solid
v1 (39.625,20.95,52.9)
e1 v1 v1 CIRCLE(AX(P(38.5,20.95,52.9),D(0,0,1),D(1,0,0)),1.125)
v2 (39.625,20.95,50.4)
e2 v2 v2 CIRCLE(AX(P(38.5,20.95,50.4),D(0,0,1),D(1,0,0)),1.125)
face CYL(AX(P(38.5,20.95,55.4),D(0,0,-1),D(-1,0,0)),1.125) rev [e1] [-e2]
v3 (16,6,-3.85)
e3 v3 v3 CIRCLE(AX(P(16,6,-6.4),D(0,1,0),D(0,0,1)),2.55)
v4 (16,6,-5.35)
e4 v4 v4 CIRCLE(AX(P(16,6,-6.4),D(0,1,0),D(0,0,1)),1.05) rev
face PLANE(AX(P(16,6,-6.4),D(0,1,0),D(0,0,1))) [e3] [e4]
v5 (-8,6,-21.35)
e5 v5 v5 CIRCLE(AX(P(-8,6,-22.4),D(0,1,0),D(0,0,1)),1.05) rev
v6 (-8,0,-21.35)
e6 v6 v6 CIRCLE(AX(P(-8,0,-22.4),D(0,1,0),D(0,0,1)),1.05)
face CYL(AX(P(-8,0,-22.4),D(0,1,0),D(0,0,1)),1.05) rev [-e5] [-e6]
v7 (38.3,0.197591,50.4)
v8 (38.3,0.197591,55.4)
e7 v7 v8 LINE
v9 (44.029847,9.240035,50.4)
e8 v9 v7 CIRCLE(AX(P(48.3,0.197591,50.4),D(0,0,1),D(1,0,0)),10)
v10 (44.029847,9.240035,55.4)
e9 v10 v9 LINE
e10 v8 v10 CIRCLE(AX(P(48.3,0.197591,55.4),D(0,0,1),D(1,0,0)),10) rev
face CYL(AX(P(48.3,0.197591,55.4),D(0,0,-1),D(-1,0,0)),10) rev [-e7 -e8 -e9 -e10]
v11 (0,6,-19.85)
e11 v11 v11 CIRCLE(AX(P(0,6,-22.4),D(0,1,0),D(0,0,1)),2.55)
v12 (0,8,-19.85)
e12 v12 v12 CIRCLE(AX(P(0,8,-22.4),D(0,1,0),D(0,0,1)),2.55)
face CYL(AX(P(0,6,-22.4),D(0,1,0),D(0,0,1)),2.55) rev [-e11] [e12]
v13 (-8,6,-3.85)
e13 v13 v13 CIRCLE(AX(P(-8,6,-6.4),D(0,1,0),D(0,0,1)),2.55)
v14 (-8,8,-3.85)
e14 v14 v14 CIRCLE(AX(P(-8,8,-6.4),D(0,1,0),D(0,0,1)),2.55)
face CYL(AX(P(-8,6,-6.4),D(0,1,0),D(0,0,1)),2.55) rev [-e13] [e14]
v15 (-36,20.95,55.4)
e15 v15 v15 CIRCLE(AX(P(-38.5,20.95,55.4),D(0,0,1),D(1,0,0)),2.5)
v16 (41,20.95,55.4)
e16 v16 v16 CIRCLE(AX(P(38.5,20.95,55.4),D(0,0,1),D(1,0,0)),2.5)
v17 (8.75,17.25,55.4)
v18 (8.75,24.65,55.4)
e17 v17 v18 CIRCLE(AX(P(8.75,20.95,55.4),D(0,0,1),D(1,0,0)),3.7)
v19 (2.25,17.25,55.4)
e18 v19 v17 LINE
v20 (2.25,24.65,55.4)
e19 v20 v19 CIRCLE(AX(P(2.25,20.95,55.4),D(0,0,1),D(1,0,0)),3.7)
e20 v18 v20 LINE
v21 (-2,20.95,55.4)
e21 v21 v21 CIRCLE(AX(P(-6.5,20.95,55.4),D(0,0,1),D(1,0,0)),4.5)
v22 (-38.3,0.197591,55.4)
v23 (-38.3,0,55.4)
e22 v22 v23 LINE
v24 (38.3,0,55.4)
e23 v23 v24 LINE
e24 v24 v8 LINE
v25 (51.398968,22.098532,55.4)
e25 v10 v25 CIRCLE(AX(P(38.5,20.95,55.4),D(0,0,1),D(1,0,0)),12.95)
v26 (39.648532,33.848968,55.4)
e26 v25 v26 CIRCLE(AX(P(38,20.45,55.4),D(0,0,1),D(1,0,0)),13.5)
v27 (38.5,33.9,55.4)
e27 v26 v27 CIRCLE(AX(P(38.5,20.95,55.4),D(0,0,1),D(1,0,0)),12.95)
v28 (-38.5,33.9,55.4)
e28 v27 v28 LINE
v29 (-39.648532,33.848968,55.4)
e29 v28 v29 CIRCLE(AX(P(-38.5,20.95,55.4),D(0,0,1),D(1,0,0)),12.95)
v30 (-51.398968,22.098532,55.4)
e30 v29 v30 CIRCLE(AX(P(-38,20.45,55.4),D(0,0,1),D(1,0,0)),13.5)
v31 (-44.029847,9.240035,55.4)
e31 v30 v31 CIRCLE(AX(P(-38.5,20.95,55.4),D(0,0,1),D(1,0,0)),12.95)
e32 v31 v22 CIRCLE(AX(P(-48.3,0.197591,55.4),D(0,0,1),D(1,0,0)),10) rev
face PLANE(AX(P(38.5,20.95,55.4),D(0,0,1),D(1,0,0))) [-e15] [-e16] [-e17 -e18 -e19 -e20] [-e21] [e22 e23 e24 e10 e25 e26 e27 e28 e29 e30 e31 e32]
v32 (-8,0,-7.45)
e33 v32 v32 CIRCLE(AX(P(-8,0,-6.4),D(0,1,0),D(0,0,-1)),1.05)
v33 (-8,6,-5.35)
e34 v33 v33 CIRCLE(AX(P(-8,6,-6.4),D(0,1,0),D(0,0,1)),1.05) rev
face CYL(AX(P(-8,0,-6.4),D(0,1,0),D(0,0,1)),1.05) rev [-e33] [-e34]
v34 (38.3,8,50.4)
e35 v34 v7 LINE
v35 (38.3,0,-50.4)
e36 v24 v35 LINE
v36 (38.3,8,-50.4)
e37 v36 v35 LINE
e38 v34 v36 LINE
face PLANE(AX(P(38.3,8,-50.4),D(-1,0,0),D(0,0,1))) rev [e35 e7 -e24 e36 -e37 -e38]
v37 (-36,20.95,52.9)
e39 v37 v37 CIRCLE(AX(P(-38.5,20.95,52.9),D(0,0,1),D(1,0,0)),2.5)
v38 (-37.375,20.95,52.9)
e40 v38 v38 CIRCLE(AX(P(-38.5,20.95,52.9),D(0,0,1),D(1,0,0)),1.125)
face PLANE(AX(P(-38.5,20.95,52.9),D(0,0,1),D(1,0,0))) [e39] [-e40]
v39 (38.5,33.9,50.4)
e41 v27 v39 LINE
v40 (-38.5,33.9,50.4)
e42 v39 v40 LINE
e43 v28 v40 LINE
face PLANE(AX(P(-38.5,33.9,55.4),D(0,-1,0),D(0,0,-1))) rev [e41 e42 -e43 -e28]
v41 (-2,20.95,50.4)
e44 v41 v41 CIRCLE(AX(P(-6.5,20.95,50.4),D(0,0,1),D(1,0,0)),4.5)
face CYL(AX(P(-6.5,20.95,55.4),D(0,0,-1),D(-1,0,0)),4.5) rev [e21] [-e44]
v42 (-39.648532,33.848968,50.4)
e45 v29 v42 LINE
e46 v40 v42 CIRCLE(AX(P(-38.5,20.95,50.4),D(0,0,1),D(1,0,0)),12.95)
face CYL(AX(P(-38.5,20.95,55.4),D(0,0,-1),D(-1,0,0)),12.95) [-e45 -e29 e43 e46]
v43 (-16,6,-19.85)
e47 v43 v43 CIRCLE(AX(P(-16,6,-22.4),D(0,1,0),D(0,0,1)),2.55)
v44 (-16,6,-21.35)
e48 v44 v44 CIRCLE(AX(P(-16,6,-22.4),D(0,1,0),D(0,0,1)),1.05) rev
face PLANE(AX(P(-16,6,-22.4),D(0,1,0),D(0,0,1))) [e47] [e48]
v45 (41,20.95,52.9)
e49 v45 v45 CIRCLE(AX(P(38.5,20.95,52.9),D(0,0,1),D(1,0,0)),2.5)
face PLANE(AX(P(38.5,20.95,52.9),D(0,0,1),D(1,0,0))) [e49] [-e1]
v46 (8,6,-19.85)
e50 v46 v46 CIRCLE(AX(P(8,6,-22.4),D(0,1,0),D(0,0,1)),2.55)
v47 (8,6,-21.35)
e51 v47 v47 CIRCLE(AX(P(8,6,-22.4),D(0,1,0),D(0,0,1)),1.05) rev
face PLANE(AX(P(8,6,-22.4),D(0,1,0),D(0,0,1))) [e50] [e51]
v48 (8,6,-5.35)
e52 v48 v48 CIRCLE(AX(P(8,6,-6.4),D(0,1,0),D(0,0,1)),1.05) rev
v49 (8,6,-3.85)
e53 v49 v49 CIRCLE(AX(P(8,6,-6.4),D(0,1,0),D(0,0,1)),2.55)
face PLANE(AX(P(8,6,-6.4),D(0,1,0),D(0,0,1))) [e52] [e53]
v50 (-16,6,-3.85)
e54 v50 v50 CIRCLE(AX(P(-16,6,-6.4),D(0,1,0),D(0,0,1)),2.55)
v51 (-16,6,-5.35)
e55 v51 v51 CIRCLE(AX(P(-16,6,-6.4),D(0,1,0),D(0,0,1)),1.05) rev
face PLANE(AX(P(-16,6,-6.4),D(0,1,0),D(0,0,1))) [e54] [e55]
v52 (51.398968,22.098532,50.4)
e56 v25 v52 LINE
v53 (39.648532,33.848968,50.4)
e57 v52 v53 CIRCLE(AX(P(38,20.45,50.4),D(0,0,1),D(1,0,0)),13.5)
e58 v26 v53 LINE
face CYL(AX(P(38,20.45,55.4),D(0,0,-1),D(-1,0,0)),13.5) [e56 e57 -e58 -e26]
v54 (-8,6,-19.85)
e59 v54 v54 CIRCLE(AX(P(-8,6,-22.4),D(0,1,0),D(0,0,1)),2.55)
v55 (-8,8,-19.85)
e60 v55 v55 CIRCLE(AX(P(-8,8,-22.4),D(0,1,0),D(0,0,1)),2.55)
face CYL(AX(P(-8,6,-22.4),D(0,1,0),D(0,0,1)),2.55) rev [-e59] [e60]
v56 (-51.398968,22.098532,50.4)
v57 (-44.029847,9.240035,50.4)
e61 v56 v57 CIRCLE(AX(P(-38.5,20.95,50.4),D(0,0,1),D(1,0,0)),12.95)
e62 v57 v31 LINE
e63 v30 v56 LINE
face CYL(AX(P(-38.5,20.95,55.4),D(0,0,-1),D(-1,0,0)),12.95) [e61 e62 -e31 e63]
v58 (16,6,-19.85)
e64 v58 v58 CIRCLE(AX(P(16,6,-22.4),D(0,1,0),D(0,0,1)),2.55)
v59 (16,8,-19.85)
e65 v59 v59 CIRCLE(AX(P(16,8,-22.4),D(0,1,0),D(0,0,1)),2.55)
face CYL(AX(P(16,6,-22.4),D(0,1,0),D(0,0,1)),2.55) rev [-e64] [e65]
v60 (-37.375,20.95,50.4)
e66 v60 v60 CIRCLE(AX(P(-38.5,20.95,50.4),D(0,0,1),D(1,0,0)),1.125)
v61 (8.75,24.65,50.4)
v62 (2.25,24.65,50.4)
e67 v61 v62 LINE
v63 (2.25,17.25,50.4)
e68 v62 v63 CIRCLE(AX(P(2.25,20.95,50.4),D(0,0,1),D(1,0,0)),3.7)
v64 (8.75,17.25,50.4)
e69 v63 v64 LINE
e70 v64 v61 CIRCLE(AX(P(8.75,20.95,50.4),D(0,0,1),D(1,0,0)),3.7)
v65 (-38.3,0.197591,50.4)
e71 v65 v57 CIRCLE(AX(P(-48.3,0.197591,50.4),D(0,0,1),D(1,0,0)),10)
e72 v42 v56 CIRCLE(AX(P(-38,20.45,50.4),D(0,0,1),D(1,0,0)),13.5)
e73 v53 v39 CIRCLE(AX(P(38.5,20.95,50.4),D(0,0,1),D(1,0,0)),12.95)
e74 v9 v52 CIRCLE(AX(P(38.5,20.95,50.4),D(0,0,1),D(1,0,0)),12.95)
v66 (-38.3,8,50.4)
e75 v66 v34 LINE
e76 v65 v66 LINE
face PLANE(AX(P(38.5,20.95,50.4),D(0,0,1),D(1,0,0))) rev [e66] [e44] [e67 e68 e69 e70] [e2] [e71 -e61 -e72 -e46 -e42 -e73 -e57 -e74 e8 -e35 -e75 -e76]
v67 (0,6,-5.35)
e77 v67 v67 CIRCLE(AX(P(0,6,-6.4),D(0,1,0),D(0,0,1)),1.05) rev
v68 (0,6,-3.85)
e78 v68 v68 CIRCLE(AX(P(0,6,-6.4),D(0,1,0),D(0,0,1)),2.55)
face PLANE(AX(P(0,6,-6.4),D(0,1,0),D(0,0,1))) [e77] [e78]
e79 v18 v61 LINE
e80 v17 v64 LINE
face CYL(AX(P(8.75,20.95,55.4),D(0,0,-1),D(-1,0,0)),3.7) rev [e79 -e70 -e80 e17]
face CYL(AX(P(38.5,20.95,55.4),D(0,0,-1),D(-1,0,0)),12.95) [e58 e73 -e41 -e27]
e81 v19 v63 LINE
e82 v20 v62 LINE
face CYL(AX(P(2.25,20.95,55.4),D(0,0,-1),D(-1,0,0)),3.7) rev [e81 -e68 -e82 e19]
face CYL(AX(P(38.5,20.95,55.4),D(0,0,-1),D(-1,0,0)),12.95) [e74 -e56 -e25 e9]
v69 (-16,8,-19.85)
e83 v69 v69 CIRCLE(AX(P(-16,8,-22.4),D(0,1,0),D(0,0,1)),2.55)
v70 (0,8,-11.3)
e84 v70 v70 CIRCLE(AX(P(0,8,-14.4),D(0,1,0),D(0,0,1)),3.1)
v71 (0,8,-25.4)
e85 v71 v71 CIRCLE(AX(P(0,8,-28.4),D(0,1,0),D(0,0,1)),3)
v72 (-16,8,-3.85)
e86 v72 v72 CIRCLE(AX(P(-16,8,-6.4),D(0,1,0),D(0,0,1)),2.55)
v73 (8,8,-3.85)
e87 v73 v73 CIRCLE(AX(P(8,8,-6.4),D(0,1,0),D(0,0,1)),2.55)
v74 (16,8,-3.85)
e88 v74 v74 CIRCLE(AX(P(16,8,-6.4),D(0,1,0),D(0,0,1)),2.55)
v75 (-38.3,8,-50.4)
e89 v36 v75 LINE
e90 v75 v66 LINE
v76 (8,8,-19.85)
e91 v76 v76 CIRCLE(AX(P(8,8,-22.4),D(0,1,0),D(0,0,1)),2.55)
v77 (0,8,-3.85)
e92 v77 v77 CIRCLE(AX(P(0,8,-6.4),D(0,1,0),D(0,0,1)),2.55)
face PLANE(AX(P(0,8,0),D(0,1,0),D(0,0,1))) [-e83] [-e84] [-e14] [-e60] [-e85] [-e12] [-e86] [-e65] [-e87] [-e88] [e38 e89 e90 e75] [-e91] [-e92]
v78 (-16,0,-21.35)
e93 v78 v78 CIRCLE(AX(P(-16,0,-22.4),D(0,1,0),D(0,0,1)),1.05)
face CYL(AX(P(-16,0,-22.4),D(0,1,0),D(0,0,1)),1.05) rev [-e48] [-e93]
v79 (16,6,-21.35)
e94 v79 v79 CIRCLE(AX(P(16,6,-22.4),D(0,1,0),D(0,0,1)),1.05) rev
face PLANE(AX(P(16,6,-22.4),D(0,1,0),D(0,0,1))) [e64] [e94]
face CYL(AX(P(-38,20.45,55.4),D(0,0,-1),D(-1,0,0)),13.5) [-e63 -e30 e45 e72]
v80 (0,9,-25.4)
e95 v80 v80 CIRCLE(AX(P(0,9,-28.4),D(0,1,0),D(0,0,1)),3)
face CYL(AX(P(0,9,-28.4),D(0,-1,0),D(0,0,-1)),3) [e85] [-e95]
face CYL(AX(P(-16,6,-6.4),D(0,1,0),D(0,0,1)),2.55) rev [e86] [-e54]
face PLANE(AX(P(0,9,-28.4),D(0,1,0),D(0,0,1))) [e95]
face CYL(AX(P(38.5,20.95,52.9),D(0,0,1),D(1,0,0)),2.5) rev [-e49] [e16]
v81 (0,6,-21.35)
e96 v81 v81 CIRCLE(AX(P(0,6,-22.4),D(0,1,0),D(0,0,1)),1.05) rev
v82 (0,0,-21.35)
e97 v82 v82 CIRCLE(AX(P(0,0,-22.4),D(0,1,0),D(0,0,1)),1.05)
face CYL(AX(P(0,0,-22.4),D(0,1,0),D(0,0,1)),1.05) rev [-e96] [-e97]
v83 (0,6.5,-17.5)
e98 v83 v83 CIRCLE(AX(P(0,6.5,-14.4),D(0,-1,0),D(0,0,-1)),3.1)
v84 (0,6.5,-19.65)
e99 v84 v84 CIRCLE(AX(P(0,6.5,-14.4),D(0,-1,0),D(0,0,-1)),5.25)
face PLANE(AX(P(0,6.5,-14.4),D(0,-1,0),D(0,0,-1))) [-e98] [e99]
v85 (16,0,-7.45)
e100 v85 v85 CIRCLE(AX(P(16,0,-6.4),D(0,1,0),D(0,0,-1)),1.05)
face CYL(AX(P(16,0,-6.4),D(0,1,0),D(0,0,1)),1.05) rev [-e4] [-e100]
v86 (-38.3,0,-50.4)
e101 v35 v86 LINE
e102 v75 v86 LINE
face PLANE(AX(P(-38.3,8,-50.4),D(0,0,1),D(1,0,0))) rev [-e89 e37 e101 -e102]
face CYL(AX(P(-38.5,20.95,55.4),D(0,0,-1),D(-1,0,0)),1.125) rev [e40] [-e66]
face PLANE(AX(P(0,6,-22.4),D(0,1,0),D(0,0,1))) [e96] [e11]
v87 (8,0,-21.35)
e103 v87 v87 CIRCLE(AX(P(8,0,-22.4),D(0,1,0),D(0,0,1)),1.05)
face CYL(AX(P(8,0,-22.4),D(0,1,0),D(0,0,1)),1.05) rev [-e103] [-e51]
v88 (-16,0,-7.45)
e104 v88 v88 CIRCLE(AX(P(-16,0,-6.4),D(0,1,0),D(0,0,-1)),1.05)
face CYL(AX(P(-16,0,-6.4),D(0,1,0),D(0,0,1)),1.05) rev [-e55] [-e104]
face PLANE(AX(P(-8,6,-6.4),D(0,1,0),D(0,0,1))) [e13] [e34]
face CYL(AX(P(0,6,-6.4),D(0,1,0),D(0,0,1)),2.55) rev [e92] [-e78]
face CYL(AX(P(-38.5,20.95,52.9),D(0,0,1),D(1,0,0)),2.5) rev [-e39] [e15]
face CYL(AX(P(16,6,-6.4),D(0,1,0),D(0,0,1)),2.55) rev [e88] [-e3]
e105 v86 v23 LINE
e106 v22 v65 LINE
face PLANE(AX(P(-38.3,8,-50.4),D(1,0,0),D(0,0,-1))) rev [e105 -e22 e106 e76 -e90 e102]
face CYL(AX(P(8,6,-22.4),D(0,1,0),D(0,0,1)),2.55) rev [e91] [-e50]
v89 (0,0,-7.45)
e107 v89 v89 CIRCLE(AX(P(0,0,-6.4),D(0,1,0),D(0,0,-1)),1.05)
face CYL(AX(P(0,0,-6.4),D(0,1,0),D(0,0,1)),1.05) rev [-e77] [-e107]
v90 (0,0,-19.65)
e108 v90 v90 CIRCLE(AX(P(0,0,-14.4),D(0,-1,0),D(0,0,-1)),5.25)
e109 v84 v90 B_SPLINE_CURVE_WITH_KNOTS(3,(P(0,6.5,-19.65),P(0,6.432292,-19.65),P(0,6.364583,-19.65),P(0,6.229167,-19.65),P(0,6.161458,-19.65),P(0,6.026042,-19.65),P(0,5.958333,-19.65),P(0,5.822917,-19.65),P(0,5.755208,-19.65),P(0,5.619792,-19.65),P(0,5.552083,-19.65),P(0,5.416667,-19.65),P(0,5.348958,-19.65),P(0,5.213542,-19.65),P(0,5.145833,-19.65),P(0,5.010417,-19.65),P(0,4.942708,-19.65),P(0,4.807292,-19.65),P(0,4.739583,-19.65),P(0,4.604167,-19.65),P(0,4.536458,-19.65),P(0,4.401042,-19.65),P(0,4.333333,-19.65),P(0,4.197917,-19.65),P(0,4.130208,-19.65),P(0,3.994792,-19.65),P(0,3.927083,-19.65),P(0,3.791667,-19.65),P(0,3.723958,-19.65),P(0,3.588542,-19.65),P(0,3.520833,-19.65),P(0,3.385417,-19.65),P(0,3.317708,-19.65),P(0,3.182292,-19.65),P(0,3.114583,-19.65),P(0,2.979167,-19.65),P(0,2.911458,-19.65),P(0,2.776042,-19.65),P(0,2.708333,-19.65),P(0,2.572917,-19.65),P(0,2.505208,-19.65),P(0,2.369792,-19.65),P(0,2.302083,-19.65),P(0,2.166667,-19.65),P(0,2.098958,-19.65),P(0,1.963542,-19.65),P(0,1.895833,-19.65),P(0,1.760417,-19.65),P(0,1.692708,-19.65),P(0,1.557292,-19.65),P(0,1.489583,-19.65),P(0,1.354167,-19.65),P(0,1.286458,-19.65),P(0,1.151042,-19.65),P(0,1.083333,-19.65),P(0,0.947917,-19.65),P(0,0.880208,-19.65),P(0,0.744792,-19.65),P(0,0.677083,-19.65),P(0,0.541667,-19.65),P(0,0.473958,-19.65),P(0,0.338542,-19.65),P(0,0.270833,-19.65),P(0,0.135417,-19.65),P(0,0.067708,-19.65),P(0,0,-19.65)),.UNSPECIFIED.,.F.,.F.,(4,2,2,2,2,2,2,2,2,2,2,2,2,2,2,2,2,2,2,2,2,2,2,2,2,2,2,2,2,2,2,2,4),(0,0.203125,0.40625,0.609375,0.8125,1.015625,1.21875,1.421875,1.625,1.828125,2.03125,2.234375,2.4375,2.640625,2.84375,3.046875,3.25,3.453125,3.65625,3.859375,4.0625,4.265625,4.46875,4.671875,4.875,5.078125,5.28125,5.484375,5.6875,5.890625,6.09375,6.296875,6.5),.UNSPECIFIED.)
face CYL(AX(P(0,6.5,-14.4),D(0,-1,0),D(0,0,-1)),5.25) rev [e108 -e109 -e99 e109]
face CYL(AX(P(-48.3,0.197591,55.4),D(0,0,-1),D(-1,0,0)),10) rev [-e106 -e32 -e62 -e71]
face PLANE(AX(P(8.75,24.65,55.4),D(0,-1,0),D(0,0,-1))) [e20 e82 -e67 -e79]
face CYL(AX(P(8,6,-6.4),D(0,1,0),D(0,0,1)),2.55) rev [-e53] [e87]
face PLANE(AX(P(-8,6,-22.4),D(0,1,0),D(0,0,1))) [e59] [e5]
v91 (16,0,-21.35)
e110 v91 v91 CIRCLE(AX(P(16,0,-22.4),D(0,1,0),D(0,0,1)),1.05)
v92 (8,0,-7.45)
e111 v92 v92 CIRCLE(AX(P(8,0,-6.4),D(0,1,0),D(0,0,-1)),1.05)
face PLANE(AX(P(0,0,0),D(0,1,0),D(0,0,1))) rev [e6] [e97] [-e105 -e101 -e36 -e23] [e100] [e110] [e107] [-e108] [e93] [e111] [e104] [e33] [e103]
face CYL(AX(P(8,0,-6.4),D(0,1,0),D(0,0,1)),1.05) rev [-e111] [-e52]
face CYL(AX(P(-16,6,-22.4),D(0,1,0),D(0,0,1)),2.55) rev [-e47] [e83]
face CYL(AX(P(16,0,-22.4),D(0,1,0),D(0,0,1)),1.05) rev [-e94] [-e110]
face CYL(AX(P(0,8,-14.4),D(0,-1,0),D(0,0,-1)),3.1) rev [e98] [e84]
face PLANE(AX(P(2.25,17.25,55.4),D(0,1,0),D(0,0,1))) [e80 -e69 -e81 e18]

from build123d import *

# Parameters (mm, degrees)
SKETCH_1_W          = 76.6
SKETCH_1_H          = 100.8
SKETCH_1_R          = 3.1
EXTRUDE_1_DEPTH     = 8
SKETCH_2_R          = 5.25
CUT_EXTRUDE_1_DEPTH = 6.5
SKETCH_3_R          = 3
EXTRUDE_2_DEPTH     = 1
SKETCH_5_R          = 1.05
CUT_EXTRUDE_2_DEPTH = 64.804780385
SKETCH_6_R          = 2.55
CUT_EXTRUDE_3_DEPTH = 2
SKETCH_7_R          = 1.125
SKETCH_7_R_2        = 4.5
EXTRUDE_3_DEPTH     = 5
FILLET_1_R          = 10
SKETCH_8_R          = 2.5
CUT_EXTRUDE_4_DEPTH = 2.5


with BuildPart() as part:
    # ｽｹｯﾁ1 → ﾎﾞｽ - 押し出し1 (new body)
    with BuildSketch(Plane(origin=(0, 0, 0), x_dir=(1, 0, 0), z_dir=(0, 1, 0))):
        Rectangle(SKETCH_1_W, SKETCH_1_H)
        with Locations(Location((0, 14.4, 0), (0, 0, 270))):
            Circle(SKETCH_1_R, mode=Mode.SUBTRACT)
    extrude(amount=EXTRUDE_1_DEPTH)

    # ｽｹｯﾁ2 → ｶｯﾄ - 押し出し1 (cut)
    with BuildSketch(Plane.XZ):
        with Locations(Location((0, -14.4, 0), (0, 0, 270))):
            Circle(SKETCH_2_R)
    extrude(amount=-CUT_EXTRUDE_1_DEPTH, mode=Mode.SUBTRACT)

    # ｽｹｯﾁ3 → ﾎﾞｽ - 押し出し2 (add)
    with BuildSketch(Plane(origin=(0, 8, 0), x_dir=(1, 0, 0), z_dir=(0, 1, 0))):
        with Locations(Location((0, 28.4, 0), (0, 0, 270))):
            Circle(SKETCH_3_R)
    extrude(amount=EXTRUDE_2_DEPTH)

    # ｽｹｯﾁ5 → ｶｯﾄ - 押し出し2 (cut, through all)
    with BuildSketch(Plane(origin=(0, 8, 0), x_dir=(1, 0, 0), z_dir=(0, 1, 0))):
        with Locations(Location((0, 22.4, 0), (0, 0, 270))):
            Circle(SKETCH_5_R)
        with Locations(Location((8, 22.4, 0), (0, 0, 270))):
            Circle(SKETCH_5_R)
        with Locations(Location((16, 22.4, 0), (0, 0, 270))):
            Circle(SKETCH_5_R)
        with Locations(Location((-8, 22.4, 0), (0, 0, 270))):
            Circle(SKETCH_5_R)
        with Locations(Location((-16, 22.4, 0), (0, 0, 270))):
            Circle(SKETCH_5_R)
        with Locations(Location((-16, 6.4, 0), (0, 0, 90))):
            Circle(SKETCH_5_R)
        with Locations(Location((-8, 6.4, 0), (0, 0, 90))):
            Circle(SKETCH_5_R)
        with Locations(Location((16, 6.4, 0), (0, 0, 90))):
            Circle(SKETCH_5_R)
        with Locations(Location((8, 6.4, 0), (0, 0, 90))):
            Circle(SKETCH_5_R)
        with Locations(Location((0, 6.4, 0), (0, 0, 90))):
            Circle(SKETCH_5_R)
    extrude(amount=-CUT_EXTRUDE_2_DEPTH, mode=Mode.SUBTRACT)

    # ｽｹｯﾁ6 → ｶｯﾄ - 押し出し3 (cut)
    with BuildSketch(Plane(origin=(0, 8, 0), x_dir=(1, 0, 0), z_dir=(0, 1, 0))):
        with Locations(Location((-8, 22.4, 0), (0, 0, 270))):
            Circle(SKETCH_6_R)
        with Locations(Location((-16, 22.4, 0), (0, 0, 270))):
            Circle(SKETCH_6_R)
        with Locations(Location((0, 22.4, 0), (0, 0, 270))):
            Circle(SKETCH_6_R)
        with Locations(Location((8, 22.4, 0), (0, 0, 270))):
            Circle(SKETCH_6_R)
        with Locations(Location((16, 22.4, 0), (0, 0, 270))):
            Circle(SKETCH_6_R)
        with Locations(Location((-8, 6.4, 0), (0, 0, 270))):
            Circle(SKETCH_6_R)
        with Locations(Location((0, 6.4, 0), (0, 0, 270))):
            Circle(SKETCH_6_R)
        with Locations(Location((8, 6.4, 0), (0, 0, 270))):
            Circle(SKETCH_6_R)
        with Locations(Location((16, 6.4, 0), (0, 0, 270))):
            Circle(SKETCH_6_R)
        with Locations(Location((-16, 6.4, 0), (0, 0, 270))):
            Circle(SKETCH_6_R)
    extrude(amount=-CUT_EXTRUDE_3_DEPTH, mode=Mode.SUBTRACT)

    # ｽｹｯﾁ7 → ﾎﾞｽ - 押し出し3 (add)
    with BuildSketch(Plane.XY.offset(50.4)):
        with BuildLine():
            Line((-38.3, 0), (38.3, 0))
            Line((38.3, 0), (38.3, 8))
            Line((38.3, 8), (38.5, 8))
            ThreePointArc((38.5, 8), (48.054475131, 12.20846095), (51.398967948, 22.098532052))
            ThreePointArc((51.398967948, 22.098532052), (47.545941546, 29.995941546), (39.648532052, 33.848967948))
            ThreePointArc((39.648532052, 33.848967948), (39.074832616, 33.887235696), (38.5, 33.9))
            Line((38.5, 33.9), (-38.5, 33.9))
            ThreePointArc((-38.5, 33.9), (-39.074832616, 33.887235696), (-39.648532052, 33.848967948))
            ThreePointArc((-39.648532052, 33.848967948), (-47.545941546, 29.995941546), (-51.398967948, 22.098532052))
            ThreePointArc((-51.398967948, 22.098532052), (-48.054475131, 12.20846095), (-38.5, 8))
            Line((-38.5, 8), (-38.3, 8))
            Line((-38.3, 8), (-38.3, 0))
        make_face()
        with Locations((-38.5, 20.95)):
            Circle(SKETCH_7_R, mode=Mode.SUBTRACT)
        with Locations((-6.5, 20.95)):
            Circle(SKETCH_7_R_2, mode=Mode.SUBTRACT)
        with Locations((38.5, 20.95)):
            Circle(SKETCH_7_R, mode=Mode.SUBTRACT)
        with BuildLine():
            Line((8.75, 24.65), (2.25, 24.65))
            ThreePointArc((2.25, 24.65), (-1.45, 20.95), (2.25, 17.25))
            Line((2.25, 17.25), (8.75, 17.25))
            ThreePointArc((8.75, 17.25), (12.45, 20.95), (8.75, 24.65))
        make_face(mode=Mode.SUBTRACT)
    extrude(amount=EXTRUDE_3_DEPTH)

    # ﾌｨﾚｯﾄ1
    # the kernel refuses this fillet: 10 mm, written as the material it adds along each edge
    with BuildSketch(Plane(origin=(-38.3, 8, 50.4), x_dir=(-0.97737367120093, 0.21151999159232296, 0), z_dir=(0, 0, 1))) as fillet_1_piece_1:
        with BuildLine():
            CenterArc((8.12337112, 9.741069532), FILLET_1_R, 192.211442518, 64.721710974)
            Line((-1.650365592, 7.625869616), (-2.627739263, 7.414349624))
            Line((-2.627739263, 7.414349624), (-0.977373671, -0.211519992))
            Line((-0.977373671, -0.211519992), (0.211519992, -0.977373671))
            ThreePointArc((0.211519992, -0.977373671), (0.406994726, -0.935069673), (5.636406526, -0.974106953))
            Line((5.636406526, -0.974106953), (5.862494216, 0))
        make_face()
    extrude(amount=5)
    with BuildSketch(Plane(origin=(38.3, 8, 50.4), x_dir=(0.9773736712009351, 0.21151999159229984, 0), z_dir=(0, 0, 1))) as fillet_1_piece_2:
        with BuildLine():
            CenterArc((8.12337112, -9.741069532), FILLET_1_R, 103.066846508, 64.721710974)
            Line((-1.650365592, -7.625869616), (-2.627739263, -7.414349624))
            Line((-2.627739263, -7.414349624), (-0.977373671, 0.211519992))
            Line((-0.977373671, 0.211519992), (0.211519992, 0.977373671))
            ThreePointArc((0.211519992, 0.977373671), (0.406994726, 0.935069673), (5.636406526, 0.974106953))
            Line((5.636406526, 0.974106953), (5.862494216, 0))
        make_face()
    extrude(amount=5)

    # ｽｹｯﾁ8 → ｶｯﾄ - 押し出し4 (cut)
    with BuildSketch(Plane.XY.offset(55.4)):
        with Locations((-38.5, 20.95)):
            Circle(SKETCH_8_R)
        with Locations((38.5, 20.95)):
            Circle(SKETCH_8_R)
    extrude(amount=-CUT_EXTRUDE_4_DEPTH, mode=Mode.SUBTRACT)


solid = part.part
